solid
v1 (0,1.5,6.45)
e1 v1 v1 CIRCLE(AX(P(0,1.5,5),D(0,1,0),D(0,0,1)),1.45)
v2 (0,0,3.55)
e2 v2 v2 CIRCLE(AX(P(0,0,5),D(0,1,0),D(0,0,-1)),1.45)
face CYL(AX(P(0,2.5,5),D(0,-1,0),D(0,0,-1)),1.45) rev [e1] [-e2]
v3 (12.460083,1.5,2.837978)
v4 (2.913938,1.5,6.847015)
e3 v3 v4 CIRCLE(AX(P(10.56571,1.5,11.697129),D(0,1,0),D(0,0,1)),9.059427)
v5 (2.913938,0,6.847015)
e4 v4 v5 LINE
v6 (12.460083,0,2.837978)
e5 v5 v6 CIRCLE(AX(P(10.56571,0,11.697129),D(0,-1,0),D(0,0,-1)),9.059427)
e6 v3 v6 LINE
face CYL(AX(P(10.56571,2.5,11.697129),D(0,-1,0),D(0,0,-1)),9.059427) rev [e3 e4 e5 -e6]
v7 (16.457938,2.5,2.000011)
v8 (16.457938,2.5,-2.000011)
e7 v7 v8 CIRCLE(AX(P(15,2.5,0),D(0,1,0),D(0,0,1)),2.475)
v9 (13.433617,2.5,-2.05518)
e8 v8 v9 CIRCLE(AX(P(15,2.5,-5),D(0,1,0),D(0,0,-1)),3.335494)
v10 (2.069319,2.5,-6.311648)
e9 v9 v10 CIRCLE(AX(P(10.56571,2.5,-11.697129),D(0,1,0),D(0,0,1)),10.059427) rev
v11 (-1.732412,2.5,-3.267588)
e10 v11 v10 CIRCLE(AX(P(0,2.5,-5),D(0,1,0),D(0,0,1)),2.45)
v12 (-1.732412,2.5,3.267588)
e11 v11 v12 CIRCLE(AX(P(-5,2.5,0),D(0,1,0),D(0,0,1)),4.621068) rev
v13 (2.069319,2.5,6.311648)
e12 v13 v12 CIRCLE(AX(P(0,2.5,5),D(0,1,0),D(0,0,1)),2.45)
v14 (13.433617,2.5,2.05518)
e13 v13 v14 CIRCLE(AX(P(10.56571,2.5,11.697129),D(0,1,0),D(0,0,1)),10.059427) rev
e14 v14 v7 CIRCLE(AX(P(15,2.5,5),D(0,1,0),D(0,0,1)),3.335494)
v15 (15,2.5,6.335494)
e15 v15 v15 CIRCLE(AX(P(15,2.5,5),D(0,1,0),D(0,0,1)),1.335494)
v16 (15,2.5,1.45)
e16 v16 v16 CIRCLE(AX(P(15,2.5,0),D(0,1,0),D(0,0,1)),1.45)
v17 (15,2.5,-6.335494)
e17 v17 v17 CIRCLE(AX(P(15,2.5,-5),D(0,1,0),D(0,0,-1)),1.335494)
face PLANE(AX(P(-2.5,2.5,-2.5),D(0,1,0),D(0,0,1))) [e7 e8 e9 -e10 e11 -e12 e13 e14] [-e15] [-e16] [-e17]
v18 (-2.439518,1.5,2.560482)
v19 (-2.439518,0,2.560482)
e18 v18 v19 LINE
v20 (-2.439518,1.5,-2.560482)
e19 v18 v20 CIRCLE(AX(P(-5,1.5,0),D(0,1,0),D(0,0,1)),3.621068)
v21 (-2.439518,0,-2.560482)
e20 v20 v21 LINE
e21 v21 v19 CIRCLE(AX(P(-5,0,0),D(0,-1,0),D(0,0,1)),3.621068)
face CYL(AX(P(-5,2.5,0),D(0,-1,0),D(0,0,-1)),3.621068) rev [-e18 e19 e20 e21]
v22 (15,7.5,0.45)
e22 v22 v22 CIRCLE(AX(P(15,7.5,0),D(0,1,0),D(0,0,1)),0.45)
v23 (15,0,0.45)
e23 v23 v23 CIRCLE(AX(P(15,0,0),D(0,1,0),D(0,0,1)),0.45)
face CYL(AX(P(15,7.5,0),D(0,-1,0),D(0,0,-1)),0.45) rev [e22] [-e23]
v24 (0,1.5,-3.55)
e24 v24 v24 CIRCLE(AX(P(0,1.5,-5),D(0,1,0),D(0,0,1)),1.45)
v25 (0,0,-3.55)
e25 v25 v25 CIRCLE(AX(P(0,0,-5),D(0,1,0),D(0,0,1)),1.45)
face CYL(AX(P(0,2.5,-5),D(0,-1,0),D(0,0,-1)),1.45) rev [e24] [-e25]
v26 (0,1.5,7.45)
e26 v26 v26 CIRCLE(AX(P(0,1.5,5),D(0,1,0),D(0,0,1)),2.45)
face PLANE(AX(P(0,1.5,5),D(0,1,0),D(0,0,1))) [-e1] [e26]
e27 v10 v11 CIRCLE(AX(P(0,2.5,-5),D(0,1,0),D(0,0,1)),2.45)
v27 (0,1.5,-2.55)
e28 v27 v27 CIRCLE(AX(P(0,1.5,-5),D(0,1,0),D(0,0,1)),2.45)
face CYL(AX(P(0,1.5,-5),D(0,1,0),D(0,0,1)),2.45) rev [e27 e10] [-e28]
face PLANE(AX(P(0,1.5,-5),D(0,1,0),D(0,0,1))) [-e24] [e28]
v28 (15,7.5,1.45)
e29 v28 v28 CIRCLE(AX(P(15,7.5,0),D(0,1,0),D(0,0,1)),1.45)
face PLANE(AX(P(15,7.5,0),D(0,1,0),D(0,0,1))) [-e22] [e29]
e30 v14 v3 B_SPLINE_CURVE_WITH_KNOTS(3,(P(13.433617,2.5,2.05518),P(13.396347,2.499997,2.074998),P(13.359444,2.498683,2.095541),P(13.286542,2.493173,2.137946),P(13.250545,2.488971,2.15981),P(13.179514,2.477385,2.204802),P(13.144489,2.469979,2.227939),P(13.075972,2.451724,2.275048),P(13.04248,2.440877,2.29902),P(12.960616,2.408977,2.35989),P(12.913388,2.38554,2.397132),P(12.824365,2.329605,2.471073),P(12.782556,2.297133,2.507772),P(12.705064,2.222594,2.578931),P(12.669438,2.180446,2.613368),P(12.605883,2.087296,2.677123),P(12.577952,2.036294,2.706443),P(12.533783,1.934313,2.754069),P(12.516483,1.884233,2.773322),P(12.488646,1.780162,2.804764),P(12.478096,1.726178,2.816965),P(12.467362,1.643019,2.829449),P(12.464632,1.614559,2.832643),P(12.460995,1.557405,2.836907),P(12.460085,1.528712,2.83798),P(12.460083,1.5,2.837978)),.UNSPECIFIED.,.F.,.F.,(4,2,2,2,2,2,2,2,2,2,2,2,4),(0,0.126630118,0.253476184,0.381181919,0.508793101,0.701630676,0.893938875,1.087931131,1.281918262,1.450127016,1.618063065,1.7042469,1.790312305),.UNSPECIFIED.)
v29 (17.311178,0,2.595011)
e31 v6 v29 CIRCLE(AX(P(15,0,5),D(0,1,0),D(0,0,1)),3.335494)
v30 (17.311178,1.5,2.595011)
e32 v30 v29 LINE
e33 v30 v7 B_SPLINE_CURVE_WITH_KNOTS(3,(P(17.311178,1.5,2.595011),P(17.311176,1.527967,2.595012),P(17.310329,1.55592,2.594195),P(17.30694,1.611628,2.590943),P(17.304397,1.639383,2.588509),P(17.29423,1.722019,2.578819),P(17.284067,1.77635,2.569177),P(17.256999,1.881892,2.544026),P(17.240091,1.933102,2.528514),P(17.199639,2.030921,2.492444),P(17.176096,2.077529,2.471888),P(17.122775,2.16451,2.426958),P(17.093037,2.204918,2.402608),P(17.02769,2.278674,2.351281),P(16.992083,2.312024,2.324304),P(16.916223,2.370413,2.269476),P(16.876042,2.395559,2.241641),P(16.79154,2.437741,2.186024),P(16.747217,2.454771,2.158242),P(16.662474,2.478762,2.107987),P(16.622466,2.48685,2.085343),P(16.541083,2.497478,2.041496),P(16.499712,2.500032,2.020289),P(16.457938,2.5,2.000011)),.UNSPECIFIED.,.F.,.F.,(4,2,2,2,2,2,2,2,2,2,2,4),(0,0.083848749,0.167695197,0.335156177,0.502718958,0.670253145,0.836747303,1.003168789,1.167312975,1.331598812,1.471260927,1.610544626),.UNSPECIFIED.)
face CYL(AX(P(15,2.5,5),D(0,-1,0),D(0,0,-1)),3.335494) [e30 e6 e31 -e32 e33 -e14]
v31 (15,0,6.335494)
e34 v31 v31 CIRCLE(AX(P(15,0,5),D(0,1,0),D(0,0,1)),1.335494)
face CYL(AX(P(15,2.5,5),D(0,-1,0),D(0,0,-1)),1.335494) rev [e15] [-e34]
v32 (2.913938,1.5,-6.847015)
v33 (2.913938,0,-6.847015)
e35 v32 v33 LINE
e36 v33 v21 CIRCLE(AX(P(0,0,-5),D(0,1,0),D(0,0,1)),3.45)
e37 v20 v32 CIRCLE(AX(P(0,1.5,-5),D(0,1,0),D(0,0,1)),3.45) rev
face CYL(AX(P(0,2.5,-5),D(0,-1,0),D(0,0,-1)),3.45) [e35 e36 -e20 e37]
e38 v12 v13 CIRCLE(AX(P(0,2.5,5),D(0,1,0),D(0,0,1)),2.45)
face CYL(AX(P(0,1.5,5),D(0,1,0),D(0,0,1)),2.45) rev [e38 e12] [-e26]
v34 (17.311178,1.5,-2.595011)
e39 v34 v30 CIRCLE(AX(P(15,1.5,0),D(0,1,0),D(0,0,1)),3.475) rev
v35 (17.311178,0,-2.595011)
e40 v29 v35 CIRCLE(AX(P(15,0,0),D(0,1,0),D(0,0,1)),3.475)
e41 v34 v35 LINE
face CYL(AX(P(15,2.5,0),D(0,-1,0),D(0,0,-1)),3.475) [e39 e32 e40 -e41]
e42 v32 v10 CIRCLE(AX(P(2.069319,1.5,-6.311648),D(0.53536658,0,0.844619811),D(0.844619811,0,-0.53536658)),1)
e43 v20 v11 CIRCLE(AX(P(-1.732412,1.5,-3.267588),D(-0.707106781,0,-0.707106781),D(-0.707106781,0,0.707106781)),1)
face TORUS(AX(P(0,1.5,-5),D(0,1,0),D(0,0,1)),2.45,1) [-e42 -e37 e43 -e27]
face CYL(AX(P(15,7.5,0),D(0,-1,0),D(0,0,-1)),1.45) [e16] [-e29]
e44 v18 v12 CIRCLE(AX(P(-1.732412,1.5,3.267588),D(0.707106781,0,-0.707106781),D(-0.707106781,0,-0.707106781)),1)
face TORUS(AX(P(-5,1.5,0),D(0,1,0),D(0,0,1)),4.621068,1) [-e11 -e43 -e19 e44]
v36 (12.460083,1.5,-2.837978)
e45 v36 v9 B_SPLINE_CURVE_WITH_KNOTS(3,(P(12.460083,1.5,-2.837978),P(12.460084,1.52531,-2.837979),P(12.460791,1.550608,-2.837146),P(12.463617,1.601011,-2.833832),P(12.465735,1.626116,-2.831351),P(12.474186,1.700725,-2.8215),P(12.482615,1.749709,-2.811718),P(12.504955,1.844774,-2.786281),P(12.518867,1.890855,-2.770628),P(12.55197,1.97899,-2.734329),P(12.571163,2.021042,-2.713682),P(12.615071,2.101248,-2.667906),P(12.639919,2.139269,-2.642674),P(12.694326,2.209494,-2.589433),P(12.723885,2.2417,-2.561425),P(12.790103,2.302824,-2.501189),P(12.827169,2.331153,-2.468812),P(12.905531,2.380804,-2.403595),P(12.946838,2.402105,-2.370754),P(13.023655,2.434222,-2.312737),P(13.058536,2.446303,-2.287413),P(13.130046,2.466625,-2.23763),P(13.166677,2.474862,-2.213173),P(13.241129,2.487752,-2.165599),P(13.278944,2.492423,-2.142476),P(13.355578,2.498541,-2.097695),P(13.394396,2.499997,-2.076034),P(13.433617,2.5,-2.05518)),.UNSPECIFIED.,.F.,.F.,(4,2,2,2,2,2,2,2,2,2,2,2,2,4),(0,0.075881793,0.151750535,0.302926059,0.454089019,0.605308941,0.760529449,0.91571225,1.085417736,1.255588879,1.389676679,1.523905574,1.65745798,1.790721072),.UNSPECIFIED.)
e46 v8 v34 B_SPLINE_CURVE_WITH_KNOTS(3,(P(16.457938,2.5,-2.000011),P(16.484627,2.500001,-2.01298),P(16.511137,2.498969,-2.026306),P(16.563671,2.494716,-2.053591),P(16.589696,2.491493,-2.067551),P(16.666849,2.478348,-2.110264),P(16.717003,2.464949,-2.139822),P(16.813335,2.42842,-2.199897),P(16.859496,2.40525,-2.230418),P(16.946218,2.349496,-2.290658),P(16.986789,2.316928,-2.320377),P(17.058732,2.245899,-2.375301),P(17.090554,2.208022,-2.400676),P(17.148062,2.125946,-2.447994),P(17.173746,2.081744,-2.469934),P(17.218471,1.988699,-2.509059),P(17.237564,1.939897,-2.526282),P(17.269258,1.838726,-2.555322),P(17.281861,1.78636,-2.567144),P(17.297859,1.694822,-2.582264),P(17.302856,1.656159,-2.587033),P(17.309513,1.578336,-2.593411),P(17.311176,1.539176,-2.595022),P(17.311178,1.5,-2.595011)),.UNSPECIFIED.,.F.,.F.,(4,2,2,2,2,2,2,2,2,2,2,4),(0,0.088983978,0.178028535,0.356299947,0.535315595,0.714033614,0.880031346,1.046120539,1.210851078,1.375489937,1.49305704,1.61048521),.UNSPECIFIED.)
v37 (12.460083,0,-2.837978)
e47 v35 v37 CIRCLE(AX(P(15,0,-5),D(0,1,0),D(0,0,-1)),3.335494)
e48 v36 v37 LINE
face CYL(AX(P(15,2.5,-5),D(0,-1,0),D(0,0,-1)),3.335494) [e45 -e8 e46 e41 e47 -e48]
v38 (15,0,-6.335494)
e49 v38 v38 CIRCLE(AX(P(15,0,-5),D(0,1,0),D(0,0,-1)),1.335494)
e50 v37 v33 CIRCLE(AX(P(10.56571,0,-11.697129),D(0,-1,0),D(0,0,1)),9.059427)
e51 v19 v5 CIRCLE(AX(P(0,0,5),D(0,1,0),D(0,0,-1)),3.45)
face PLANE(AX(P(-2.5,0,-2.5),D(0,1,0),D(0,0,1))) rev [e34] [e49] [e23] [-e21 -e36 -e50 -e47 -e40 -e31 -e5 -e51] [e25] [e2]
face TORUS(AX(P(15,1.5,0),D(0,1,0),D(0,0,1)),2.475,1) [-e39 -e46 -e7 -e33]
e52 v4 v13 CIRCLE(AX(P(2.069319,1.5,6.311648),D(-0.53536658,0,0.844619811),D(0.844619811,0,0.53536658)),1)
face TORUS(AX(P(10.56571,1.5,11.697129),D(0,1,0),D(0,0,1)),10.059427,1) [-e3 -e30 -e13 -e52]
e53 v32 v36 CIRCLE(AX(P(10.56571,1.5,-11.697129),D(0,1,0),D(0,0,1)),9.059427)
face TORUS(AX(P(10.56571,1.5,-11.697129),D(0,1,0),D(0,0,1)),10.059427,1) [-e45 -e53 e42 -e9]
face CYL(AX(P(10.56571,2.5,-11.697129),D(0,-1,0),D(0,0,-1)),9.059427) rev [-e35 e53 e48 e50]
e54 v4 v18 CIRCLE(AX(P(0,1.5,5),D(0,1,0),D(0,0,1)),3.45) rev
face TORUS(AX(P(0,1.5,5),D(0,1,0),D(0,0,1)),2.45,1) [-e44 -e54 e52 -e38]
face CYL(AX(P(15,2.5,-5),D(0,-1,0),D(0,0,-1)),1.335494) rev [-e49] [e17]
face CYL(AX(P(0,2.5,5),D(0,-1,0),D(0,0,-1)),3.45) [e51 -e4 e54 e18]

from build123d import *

# Parameters (mm, degrees)
CROQUIS2_R              = 1.45
CROQUIS2_R_2            = 1.335493539
SALIENTE_EXTRUIR1_DEPTH = 2.5
CROQUIS3_R              = 2.45
CORTAR_EXTRUIR1_DEPTH   = 1
CROQUIS4_R              = 1.45
CROQUIS4_R_2            = 0.45
SALIENTE_EXTRUIR2_DEPTH = 5
CROQUIS5_R              = 0.45
CORTAR_EXTRUIR2_DEPTH   = 21.921953183
REDONDEO1_R             = 1


with BuildPart() as part:
    # Croquis2 → Saliente-Extruir1 (new body)
    with BuildSketch(Plane(origin=(0, 0, 0), x_dir=(1, 0, 0), z_dir=(0, 1, 0))):
        with BuildLine():
            ThreePointArc((17.31117806, -2.595010785), (18.475, 0), (17.31117806, 2.595010785))
            ThreePointArc((17.31117806, 2.595010785), (15.166848951, 8.331317844), (12.46008331, 2.837977715))
            ThreePointArc((12.46008331, 2.837977715), (7.057861128, 3.344392229), (2.913938348, 6.8470147))
            ThreePointArc((2.913938348, 6.8470147), (-2.156353419, 7.693072582), (-2.439518395, 2.560481605))
            ThreePointArc((-2.439518395, 2.560481605), (-1.378932188, 0), (-2.439518395, -2.560481605))
            ThreePointArc((-2.439518395, -2.560481605), (-2.156353419, -7.693072582), (2.913938348, -6.8470147))
            ThreePointArc((2.913938348, -6.8470147), (7.057861128, -3.344392229), (12.46008331, -2.837977715))
            ThreePointArc((12.46008331, -2.837977715), (15.166848951, -8.331317844), (17.31117806, -2.595010785))
        make_face()
        with Locations(Location((0, 5, 0), (0, 0, 270))):
            Circle(CROQUIS2_R, mode=Mode.SUBTRACT)
        with Locations(Location((0, -5, 0), (0, 0, 90))):
            Circle(CROQUIS2_R, mode=Mode.SUBTRACT)
        with Locations(Location((15, -5, 0), (0, 0, 270))):
            Circle(CROQUIS2_R_2, mode=Mode.SUBTRACT)
        with Locations(Location((15, 5, 0), (0, 0, 90))):
            Circle(CROQUIS2_R_2, mode=Mode.SUBTRACT)
    extrude(amount=SALIENTE_EXTRUIR1_DEPTH)

    # Croquis3 → Cortar-Extruir1 (cut)
    with BuildSketch(Plane(origin=(0, 2.5, 0), x_dir=(1, 0, 0), z_dir=(0, 1, 0))):
        with Locations(Location((0, 5, 0), (0, 0, 270))):
            Circle(CROQUIS3_R)
        with Locations(Location((0, -5, 0), (0, 0, 270))):
            Circle(CROQUIS3_R)
    extrude(amount=-CORTAR_EXTRUIR1_DEPTH, mode=Mode.SUBTRACT)

    # Croquis4 → Saliente-Extruir2 (add)
    with BuildSketch(Plane(origin=(0, 2.5, 0), x_dir=(1, 0, 0), z_dir=(0, 1, 0))):
        with Locations(Location((15, 0, 0), (0, 0, 270))):
            Circle(CROQUIS4_R)
        with Locations(Location((15, 0, 0), (0, 0, 270))):
            Circle(CROQUIS4_R_2, mode=Mode.SUBTRACT)
    extrude(amount=SALIENTE_EXTRUIR2_DEPTH)

    # Croquis5 → Cortar-Extruir2 (cut, through all)
    with BuildSketch(Plane(origin=(0, 2.5, 0), x_dir=(1, 0, 0), z_dir=(0, 1, 0))):
        with Locations(Location((15, 0, 0), (0, 0, 270))):
            Circle(CROQUIS5_R)
    extrude(amount=-CORTAR_EXTRUIR2_DEPTH, mode=Mode.SUBTRACT)

    # Redondeo1
    # the kernel refuses this fillet: 1 mm, written as the material it takes off along each edge
    with BuildSketch(Plane(origin=(10.565709674, 2.5, 11.697129023), x_dir=(-0.8446198111127597, 0, -0.5353665797151015), z_dir=(-0.5353665797151015, 0, 0.8446198111127597))) as redondeo1_piece_1_section:
        with BuildLine():
            CenterArc((9.059426769 + REDONDEO1_R, REDONDEO1_R), REDONDEO1_R, 180, 90)
            Line((9.059426769, REDONDEO1_R), (9.059426769 - REDONDEO1_R * 0.02, REDONDEO1_R))
            Line((9.059426769 - REDONDEO1_R * 0.02, REDONDEO1_R), (9.059426769 - REDONDEO1_R * 0.02, -REDONDEO1_R * 0.02))
            Line((9.059426769 - REDONDEO1_R * 0.02, -REDONDEO1_R * 0.02), (9.059426769 + REDONDEO1_R, -REDONDEO1_R * 0.02))
            Line((9.059426769 + REDONDEO1_R, -REDONDEO1_R * 0.02), (9.059426769 + REDONDEO1_R, 0))
        make_face()
    redondeo1_piece_1 = revolve(axis=Axis((10.565709674, 2.5, 11.697129023), (0, -1, 0)), revolution_arc=85.516050129, mode=Mode.PRIVATE)
    redondeo1_piece_1 = redondeo1_piece_1 - Plane(origin=(15, 2.217210624, 5), x_dir=(-0.7614815197926343, 0, -0.6481866205147249), z_dir=(0, -1, 0)) * Cylinder(3.335493539, 41, mode=Mode.PRIVATE)
    add(redondeo1_piece_1, mode=Mode.SUBTRACT)
    with BuildSketch(Plane(origin=(15, 2.5, 0), x_dir=(0.007852951460832107, 0, 0.9999691651012815), z_dir=(-0.9999691651012815, 0, 0.007852951460832107))) as redondeo1_piece_2_section:
        with BuildLine():
            CenterArc((3.475 - REDONDEO1_R, -REDONDEO1_R), REDONDEO1_R, 0, 90)
            Line((3.475, -REDONDEO1_R), (3.475 + REDONDEO1_R * 0.02, -REDONDEO1_R))
            Line((3.475 + REDONDEO1_R * 0.02, -REDONDEO1_R), (3.475 + REDONDEO1_R * 0.02, REDONDEO1_R * 0.02))
            Line((3.475 + REDONDEO1_R * 0.02, REDONDEO1_R * 0.02), (3.475 - REDONDEO1_R, REDONDEO1_R * 0.02))
            Line((3.475 - REDONDEO1_R, REDONDEO1_R * 0.02), (3.475 - REDONDEO1_R, 0))
        make_face()
    redondeo1_piece_2 = revolve(axis=Axis((15, 2.5, 0), (0, 1, 0)), revolution_arc=179.1001088, mode=Mode.PRIVATE)
    redondeo1_piece_2 = redondeo1_piece_2 - Plane(origin=(15, 2.215042964, -5), x_dir=(0.6929043732212018, 0, 0.7210294928579091), z_dir=(0, -1, 0)) * Cylinder(3.335493539, 14, mode=Mode.PRIVATE)
    redondeo1_piece_2 = redondeo1_piece_2 - Plane(origin=(15, 2.215042964, 5), x_dir=(-0.7614815197926343, 0, -0.6481866205147249), z_dir=(0, -1, 0)) * Cylinder(3.335493539, 14, mode=Mode.PRIVATE)
    add(redondeo1_piece_2, mode=Mode.SUBTRACT)
    with BuildSketch(Plane(origin=(10.565709674, 2.5, -11.697129023), x_dir=(0.4676957368071937, 0, 0.883889528036381), z_dir=(0.883889528036381, 0, -0.4676957368071937))) as redondeo1_piece_3_section:
        with BuildLine():
            CenterArc((9.059426769 + REDONDEO1_R, REDONDEO1_R), REDONDEO1_R, 180, 90)
            Line((9.059426769 + REDONDEO1_R, 0), (9.059426769 + REDONDEO1_R, -REDONDEO1_R * 0.02))
            Line((9.059426769 + REDONDEO1_R, -REDONDEO1_R * 0.02), (9.059426769 - REDONDEO1_R * 0.02, -REDONDEO1_R * 0.02))
            Line((9.059426769 - REDONDEO1_R * 0.02, -REDONDEO1_R * 0.02), (9.059426769 - REDONDEO1_R * 0.02, REDONDEO1_R))
            Line((9.059426769 - REDONDEO1_R * 0.02, REDONDEO1_R), (9.059426769, REDONDEO1_R))
        make_face()
    redondeo1_piece_3 = revolve(axis=Axis((10.565709674, 2.5, -11.697129023), (0, -1, 0)), revolution_arc=85.516050129, mode=Mode.PRIVATE)
    redondeo1_piece_3 = redondeo1_piece_3 - Plane(origin=(15, 2.217210619, -5), x_dir=(0.6929043732212018, 0, 0.7210294928579091), z_dir=(0, -1, 0)) * Cylinder(3.335493539, 41, mode=Mode.PRIVATE)
    add(redondeo1_piece_3, mode=Mode.SUBTRACT)
    with BuildSketch(Plane(origin=(0, 2.5, -5), x_dir=(0.8446198111127605, 0, -0.5353665797151004), z_dir=(0.5353665797151004, 0, 0.8446198111127605))) as redondeo1_piece_4:
        with BuildLine():
            CenterArc((3.45 - REDONDEO1_R, -REDONDEO1_R), REDONDEO1_R, 0, 90)
            Line((3.45 - REDONDEO1_R, 0), (3.45 - REDONDEO1_R, REDONDEO1_R * 0.02))
            Line((3.45 - REDONDEO1_R, REDONDEO1_R * 0.02), (3.45 + REDONDEO1_R * 0.02, REDONDEO1_R * 0.02))
            Line((3.45 + REDONDEO1_R * 0.02, REDONDEO1_R * 0.02), (3.45 + REDONDEO1_R * 0.02, -REDONDEO1_R))
            Line((3.45 + REDONDEO1_R * 0.02, -REDONDEO1_R), (3.45, -REDONDEO1_R))
        make_face()
    revolve(axis=Axis((0, 2.5, -5), (0, 1, 0)), revolution_arc=192.631224639, mode=Mode.SUBTRACT)
    with BuildSketch(Plane(origin=(-5, 2.5, 0), x_dir=(0.7071067811865475, 0, -0.7071067811865476), z_dir=(-0.7071067811865476, 0, -0.7071067811865475))) as redondeo1_piece_5:
        with BuildLine():
            CenterArc((3.621067812 + REDONDEO1_R, REDONDEO1_R), REDONDEO1_R, 180, 90)
            Line((3.621067812 + REDONDEO1_R, 0), (3.621067812 + REDONDEO1_R, -REDONDEO1_R * 0.02))
            Line((3.621067812 + REDONDEO1_R, -REDONDEO1_R * 0.02), (3.621067812 - REDONDEO1_R * 0.02, -REDONDEO1_R * 0.02))
            Line((3.621067812 - REDONDEO1_R * 0.02, -REDONDEO1_R * 0.02), (3.621067812 - REDONDEO1_R * 0.02, REDONDEO1_R))
            Line((3.621067812 - REDONDEO1_R * 0.02, REDONDEO1_R), (3.621067812, REDONDEO1_R))
        make_face()
    revolve(axis=Axis((-5, 2.5, 0), (0, -1, 0)), revolution_arc=90, mode=Mode.SUBTRACT)
    with BuildSketch(Plane(origin=(0, 2.5, 5), x_dir=(-0.7071067811865475, 0, -0.7071067811865476), z_dir=(0.7071067811865476, 0, -0.7071067811865475))) as redondeo1_piece_6:
        with BuildLine():
            CenterArc((3.45 - REDONDEO1_R, -REDONDEO1_R), REDONDEO1_R, 0, 90)
            Line((3.45, -REDONDEO1_R), (3.45 + REDONDEO1_R * 0.02, -REDONDEO1_R))
            Line((3.45 + REDONDEO1_R * 0.02, -REDONDEO1_R), (3.45 + REDONDEO1_R * 0.02, REDONDEO1_R * 0.02))
            Line((3.45 + REDONDEO1_R * 0.02, REDONDEO1_R * 0.02), (3.45 - REDONDEO1_R, REDONDEO1_R * 0.02))
            Line((3.45 - REDONDEO1_R, REDONDEO1_R * 0.02), (3.45 - REDONDEO1_R, 0))
        make_face()
    revolve(axis=Axis((0, 2.5, 5), (0, 1, 0)), revolution_arc=192.631224639, mode=Mode.SUBTRACT)


solid = part.part
